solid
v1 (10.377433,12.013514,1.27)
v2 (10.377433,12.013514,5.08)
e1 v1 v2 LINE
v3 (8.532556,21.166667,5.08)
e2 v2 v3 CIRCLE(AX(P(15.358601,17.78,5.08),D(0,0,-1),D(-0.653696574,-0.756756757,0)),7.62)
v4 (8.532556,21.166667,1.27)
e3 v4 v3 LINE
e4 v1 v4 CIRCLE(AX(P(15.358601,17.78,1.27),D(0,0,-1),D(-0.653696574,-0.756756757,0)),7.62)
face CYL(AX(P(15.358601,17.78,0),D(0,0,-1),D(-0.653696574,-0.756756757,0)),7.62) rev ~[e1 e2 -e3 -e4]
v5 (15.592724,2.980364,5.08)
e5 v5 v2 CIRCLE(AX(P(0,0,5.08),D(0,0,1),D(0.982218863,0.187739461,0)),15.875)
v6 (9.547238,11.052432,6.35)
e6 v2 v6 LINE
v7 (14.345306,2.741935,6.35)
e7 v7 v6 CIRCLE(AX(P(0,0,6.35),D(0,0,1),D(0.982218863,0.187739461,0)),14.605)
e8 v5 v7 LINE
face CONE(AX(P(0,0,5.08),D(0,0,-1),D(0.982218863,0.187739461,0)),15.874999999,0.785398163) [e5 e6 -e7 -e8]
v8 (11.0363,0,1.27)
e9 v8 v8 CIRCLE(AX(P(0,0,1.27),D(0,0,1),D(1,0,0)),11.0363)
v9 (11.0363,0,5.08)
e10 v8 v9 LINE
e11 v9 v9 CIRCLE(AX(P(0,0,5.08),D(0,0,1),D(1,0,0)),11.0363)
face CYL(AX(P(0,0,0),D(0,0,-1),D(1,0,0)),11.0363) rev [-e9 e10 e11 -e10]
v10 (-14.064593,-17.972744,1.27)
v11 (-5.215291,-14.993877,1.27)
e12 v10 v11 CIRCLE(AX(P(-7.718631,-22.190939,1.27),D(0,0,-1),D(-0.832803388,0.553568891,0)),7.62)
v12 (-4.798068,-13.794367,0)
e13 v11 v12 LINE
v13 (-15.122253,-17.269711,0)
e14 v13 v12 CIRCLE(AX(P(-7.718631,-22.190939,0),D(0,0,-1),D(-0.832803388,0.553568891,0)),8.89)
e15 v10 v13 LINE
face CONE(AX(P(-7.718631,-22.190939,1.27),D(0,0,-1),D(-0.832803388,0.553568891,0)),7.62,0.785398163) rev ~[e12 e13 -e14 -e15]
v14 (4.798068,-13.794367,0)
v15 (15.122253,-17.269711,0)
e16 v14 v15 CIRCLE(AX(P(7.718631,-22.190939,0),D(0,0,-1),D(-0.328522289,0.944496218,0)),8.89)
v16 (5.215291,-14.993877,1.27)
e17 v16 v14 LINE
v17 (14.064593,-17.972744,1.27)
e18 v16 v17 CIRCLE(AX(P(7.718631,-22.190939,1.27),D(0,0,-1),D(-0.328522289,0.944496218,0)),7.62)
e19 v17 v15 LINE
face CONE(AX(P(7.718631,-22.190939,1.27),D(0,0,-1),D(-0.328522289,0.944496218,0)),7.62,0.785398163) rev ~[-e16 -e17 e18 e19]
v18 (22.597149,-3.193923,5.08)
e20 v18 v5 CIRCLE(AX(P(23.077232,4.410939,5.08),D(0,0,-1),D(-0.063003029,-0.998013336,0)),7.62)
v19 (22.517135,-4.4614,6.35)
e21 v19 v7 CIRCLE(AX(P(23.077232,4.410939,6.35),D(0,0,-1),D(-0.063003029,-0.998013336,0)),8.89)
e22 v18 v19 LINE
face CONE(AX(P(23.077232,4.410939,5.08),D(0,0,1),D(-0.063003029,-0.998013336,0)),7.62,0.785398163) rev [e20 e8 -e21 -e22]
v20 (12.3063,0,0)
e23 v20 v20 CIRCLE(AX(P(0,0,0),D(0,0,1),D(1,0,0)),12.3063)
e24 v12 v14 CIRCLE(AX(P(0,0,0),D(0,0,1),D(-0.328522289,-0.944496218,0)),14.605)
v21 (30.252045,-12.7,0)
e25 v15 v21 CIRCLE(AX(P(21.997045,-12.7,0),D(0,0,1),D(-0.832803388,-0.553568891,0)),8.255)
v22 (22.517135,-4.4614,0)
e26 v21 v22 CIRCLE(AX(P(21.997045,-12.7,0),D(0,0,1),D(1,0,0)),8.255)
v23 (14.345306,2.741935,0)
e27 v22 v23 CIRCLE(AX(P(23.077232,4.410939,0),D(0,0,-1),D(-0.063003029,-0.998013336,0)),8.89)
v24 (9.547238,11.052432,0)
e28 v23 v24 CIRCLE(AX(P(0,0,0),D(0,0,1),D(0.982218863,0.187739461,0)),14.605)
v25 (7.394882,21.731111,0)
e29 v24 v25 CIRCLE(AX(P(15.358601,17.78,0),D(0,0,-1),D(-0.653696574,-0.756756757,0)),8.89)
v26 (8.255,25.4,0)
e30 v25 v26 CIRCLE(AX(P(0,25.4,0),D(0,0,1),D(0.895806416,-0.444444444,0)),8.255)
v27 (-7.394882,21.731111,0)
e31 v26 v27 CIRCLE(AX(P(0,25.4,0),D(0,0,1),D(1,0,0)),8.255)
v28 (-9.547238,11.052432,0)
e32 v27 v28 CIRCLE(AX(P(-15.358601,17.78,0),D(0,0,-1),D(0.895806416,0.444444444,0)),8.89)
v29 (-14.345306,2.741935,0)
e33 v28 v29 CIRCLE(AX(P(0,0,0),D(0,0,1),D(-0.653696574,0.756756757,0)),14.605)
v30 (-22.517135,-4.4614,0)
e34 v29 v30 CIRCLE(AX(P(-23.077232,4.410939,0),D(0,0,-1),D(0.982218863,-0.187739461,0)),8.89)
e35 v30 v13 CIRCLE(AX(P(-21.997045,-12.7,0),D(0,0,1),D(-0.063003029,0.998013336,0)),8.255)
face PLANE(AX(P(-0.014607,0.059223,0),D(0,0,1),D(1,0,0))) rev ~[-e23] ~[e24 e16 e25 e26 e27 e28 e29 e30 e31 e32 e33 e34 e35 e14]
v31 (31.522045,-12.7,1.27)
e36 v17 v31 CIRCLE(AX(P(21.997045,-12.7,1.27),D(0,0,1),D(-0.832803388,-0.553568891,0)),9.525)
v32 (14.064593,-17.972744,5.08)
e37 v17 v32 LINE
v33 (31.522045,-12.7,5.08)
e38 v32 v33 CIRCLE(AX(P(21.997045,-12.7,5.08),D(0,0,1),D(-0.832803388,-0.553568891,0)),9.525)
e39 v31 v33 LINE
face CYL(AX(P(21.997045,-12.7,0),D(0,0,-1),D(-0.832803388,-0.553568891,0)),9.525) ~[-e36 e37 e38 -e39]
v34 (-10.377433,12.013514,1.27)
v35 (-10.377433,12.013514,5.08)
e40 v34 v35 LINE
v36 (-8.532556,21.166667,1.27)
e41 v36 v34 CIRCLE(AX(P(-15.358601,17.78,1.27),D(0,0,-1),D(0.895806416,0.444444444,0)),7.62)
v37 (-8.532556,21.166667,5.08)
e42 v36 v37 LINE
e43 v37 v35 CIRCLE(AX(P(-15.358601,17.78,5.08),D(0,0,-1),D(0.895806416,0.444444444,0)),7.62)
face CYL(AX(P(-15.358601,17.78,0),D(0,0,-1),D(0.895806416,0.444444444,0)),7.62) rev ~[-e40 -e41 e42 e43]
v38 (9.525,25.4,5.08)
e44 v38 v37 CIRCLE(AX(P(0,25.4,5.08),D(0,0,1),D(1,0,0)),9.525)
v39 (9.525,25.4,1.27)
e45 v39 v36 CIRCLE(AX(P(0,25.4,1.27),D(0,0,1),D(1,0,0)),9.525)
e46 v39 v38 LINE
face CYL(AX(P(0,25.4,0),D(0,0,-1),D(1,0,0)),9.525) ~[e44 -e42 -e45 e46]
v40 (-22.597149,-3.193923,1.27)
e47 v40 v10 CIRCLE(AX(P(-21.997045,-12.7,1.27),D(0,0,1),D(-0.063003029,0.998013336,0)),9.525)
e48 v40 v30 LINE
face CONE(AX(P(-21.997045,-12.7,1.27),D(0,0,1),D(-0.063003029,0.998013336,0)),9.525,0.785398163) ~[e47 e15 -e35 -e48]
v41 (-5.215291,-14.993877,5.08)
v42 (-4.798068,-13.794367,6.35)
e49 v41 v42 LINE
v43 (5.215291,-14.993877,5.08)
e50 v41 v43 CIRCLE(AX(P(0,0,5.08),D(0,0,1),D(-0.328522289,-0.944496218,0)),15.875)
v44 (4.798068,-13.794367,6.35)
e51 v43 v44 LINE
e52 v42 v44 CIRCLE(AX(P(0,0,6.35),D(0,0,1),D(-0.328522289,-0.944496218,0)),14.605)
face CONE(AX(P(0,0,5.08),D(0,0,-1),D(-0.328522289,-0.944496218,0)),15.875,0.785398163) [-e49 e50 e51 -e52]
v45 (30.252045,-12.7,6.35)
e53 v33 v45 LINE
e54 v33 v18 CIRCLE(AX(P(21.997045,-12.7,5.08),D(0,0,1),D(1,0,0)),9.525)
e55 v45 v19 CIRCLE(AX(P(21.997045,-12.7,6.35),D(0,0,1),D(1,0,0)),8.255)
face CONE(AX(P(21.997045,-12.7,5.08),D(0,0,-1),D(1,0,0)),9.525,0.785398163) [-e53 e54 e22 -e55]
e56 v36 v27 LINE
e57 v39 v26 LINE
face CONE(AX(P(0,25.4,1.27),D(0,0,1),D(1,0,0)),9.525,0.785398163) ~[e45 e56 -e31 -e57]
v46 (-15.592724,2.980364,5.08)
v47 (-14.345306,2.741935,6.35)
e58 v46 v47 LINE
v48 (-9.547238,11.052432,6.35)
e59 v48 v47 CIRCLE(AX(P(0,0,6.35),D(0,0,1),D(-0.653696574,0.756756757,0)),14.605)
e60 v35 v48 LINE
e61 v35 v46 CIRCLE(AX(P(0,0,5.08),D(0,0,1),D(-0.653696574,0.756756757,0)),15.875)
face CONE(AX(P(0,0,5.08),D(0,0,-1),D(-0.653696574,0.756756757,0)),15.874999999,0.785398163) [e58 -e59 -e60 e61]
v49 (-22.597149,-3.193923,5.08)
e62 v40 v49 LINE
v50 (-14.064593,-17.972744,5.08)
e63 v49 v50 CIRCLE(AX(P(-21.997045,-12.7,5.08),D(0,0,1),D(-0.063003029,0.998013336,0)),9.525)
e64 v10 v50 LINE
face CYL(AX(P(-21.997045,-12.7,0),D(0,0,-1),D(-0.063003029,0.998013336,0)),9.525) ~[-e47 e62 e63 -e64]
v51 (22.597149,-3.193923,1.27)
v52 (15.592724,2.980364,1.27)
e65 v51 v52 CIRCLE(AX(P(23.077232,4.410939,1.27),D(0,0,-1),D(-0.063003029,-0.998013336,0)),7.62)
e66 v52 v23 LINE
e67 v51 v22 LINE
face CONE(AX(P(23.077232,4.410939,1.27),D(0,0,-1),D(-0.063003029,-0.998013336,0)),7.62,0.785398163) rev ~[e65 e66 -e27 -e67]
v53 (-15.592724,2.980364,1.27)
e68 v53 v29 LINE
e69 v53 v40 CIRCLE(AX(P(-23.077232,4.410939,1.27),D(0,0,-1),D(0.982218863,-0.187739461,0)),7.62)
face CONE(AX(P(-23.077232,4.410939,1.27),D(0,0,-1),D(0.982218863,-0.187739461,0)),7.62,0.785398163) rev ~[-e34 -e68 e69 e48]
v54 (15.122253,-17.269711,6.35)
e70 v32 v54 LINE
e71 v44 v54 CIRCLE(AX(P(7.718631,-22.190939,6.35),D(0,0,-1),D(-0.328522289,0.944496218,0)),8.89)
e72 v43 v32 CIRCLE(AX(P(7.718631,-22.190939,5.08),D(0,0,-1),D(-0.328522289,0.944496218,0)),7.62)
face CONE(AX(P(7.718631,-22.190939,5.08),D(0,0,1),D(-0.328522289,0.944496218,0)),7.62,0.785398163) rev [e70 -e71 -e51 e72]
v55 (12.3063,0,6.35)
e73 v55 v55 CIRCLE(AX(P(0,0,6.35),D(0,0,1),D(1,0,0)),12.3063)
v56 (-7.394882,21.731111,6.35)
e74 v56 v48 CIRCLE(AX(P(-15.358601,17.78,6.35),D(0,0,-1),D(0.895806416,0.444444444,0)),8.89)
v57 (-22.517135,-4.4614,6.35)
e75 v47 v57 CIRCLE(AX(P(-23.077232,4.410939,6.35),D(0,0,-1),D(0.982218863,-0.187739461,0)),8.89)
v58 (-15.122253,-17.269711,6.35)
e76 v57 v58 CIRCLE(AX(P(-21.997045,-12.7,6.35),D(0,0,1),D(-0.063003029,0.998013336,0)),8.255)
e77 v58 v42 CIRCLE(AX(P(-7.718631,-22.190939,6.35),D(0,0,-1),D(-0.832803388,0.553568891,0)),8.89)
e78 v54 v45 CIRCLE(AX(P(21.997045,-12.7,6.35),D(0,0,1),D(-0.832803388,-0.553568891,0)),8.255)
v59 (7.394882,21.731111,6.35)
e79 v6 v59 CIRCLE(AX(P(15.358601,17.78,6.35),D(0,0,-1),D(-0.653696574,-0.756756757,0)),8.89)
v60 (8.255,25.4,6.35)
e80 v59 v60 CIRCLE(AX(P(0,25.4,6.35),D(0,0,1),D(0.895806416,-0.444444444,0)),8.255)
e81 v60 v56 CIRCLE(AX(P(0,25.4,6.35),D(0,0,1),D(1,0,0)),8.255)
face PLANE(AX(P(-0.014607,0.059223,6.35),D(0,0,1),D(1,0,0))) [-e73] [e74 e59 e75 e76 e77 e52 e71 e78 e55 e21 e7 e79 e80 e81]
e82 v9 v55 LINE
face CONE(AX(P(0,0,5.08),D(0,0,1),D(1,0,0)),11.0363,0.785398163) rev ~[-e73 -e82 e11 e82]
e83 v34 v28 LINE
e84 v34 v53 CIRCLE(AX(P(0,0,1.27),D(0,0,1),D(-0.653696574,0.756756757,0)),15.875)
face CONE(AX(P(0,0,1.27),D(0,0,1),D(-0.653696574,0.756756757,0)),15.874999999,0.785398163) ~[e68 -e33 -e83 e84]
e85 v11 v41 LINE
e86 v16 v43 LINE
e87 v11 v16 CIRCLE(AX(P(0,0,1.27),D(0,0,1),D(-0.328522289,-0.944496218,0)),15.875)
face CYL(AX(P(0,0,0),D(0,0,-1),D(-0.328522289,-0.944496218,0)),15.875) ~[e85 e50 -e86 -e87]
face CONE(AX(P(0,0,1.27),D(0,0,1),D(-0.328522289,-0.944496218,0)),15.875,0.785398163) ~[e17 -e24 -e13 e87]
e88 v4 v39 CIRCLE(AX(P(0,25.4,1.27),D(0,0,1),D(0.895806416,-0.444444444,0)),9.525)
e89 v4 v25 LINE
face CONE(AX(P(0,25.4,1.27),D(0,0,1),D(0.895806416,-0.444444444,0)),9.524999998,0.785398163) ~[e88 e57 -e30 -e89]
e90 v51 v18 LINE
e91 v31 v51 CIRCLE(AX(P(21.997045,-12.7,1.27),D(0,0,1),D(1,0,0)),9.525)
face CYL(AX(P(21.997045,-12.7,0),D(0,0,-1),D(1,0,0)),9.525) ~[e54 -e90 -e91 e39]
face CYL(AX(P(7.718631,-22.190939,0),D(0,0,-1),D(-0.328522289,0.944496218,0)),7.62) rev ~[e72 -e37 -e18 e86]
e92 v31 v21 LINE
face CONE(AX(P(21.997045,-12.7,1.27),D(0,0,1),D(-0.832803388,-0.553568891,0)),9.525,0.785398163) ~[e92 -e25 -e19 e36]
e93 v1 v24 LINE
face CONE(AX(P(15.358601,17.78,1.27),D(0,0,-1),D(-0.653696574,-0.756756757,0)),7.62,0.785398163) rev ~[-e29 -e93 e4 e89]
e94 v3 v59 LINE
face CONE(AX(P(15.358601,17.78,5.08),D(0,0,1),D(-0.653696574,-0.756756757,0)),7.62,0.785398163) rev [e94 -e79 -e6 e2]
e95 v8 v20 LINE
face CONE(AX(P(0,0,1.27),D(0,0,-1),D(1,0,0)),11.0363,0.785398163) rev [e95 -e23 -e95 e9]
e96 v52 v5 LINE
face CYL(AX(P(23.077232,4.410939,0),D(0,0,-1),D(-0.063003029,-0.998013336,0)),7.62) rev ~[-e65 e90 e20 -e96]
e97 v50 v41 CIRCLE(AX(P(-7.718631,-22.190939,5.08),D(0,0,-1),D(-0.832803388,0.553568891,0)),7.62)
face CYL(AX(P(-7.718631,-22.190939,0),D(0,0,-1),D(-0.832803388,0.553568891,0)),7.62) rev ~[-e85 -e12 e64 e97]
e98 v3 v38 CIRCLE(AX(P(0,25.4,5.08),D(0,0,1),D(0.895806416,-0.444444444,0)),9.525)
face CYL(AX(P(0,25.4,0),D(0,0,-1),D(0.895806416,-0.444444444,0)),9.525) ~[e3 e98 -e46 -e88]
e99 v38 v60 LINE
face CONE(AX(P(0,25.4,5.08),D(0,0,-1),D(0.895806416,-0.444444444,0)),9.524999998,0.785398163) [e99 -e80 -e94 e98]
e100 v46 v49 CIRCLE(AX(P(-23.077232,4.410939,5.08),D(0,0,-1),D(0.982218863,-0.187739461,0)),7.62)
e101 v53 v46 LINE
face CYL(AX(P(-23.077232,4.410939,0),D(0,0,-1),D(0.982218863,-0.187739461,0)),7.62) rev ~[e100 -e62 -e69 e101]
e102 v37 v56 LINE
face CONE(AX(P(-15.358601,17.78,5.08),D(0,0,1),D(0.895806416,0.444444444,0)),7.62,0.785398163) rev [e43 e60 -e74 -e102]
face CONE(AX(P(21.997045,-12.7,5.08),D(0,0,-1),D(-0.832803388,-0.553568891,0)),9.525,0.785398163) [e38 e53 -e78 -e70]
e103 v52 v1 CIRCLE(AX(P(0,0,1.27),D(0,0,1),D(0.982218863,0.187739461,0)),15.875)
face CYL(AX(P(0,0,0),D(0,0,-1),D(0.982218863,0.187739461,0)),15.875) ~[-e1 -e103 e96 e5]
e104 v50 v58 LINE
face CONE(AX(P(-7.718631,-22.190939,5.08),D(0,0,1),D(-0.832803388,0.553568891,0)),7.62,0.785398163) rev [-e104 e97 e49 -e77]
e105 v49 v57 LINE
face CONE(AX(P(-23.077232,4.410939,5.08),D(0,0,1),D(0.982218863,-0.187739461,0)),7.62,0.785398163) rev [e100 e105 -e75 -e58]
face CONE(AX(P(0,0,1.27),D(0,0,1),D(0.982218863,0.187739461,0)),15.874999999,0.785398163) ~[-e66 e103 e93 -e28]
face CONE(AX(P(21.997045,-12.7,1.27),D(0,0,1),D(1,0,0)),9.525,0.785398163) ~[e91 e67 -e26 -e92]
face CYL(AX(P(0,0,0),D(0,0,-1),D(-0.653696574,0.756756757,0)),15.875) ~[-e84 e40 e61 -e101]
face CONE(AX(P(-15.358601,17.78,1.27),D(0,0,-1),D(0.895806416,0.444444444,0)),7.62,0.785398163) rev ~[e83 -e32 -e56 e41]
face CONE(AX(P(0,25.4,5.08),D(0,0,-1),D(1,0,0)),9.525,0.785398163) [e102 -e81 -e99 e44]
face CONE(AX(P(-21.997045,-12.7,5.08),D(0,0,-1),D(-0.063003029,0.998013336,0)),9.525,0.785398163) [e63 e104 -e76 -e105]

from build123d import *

# Parameters (mm, degrees)
F0_R     = 11.0363
F1_DEPTH = 6.35
F2_SIZE  = 1.27


# Not quite as in the source:
# - a feature names something its author has since deleted; it is built from what else it names


with BuildPart() as f1:
    # F0 (on Top) → F1 (new body)
    with BuildSketch(Plane.XY):
        with BuildLine():
            ThreePointArc((13.7481534459, -7.9374997215), (15.334072534, -4.1087521857), (15.875, 0))
            ThreePointArc((15.875, 0), (15.8042735617, 1.4968507561), (15.592724449, 2.9803639471))
            ThreePointArc((15.592724449, 2.9803639471), (13.7481532851, 7.9375), (10.3774331152, 12.0135135135))
            ThreePointArc((10.3774331152, 12.0135135135), (5.5362937901, 14.8783425176), (-1.09e-08, 15.875))
            ThreePointArc((-1.09e-08, 15.875), (-5.5362938003, 14.8783425138), (-10.3774331152, 12.0135135135))
            ThreePointArc((-10.3774331152, 12.0135135135), (-13.7481532851, 7.9375), (-15.592724449, 2.9803639471))
            ThreePointArc((-15.592724449, 2.9803639471), (-15.6531695071, -2.6446000421), (-13.7481534335, -7.9374997429))
            ThreePointArc((-13.7481534335, -7.9374997429), (-10.1168758016, -12.2337422327), (-5.2152913338, -14.9938774606))
            ThreePointArc((-5.2152913338, -14.9938774606), (0, -15.875), (5.2152913338, -14.9938774606))
            ThreePointArc((5.2152913338, -14.9938774606), (10.1168758111, -12.2337422248), (13.7481534459, -7.9374997215))
        make_face()
        Circle(F0_R, mode=Mode.SUBTRACT)
        with BuildLine():
            ThreePointArc((15.592724449, 2.9803639471), (15.8042735617, 1.4968507561), (15.875, 0))
            ThreePointArc((15.875, 0), (15.334072534, -4.1087521857), (13.7481534459, -7.9374997215))
            ThreePointArc((13.7481534459, -7.9374997215), (17.4968931029, -4.3051053849), (22.5971491052, -3.1939229768))
            ThreePointArc((22.5971491052, -3.1939229768), (18.038469294, -1.3052898819), (15.592724449, 2.9803639471))
        make_face()
        with BuildLine():
            ThreePointArc((14.0645929883, -17.9727436898), (12.4767771707, -13.0002009006), (13.7481534459, -7.9374997215))
            ThreePointArc((13.7481534459, -7.9374997215), (10.1168758111, -12.2337422248), (5.2152913338, -14.9938774606))
            ThreePointArc((5.2152913338, -14.9938774606), (10.149648844, -14.9691277131), (14.0645929883, -17.9727436898))
        make_face()
        with BuildLine():
            ThreePointArc((22.5971491052, -3.1939229768), (17.4968931029, -4.3051053849), (13.7481534459, -7.9374997215))
            ThreePointArc((13.7481534459, -7.9374997215), (12.4767771707, -13.0002009006), (14.0645929883, -17.9727436898))
            ThreePointArc((14.0645929883, -17.9727436898), (24.751043908, -21.81817506), (31.5220452561, -12.7))
            ThreePointArc((31.5220452561, -12.7), (28.9411655806, -6.1804280878), (22.5971491052, -3.1939229768))
        make_face()
        with BuildLine():
            ThreePointArc((-1.09e-08, 15.875), (5.5362937901, 14.8783425176), (10.3774331152, 12.0135135135))
            ThreePointArc((10.3774331152, 12.0135135135), (7.88882045, 16.274417595), (8.5325561169, 21.1666666667))
            ThreePointArc((8.5325561169, 21.1666666667), (5.0201157809, 17.3053065193), (-1.09e-08, 15.875))
        make_face()
        with BuildLine():
            ThreePointArc((-10.3774331152, 12.0135135135), (-5.5362938003, 14.8783425138), (-1.09e-08, 15.875))
            ThreePointArc((-1.09e-08, 15.875), (-5.0201157901, 17.305306525), (-8.5325561169, 21.1666666667))
            ThreePointArc((-8.5325561169, 21.1666666667), (-7.88882045, 16.274417595), (-10.3774331152, 12.0135135135))
        make_face()
        with BuildLine():
            ThreePointArc((-8.5325561169, 21.1666666667), (-5.0201157901, 17.305306525), (-1.09e-08, 15.875))
            ThreePointArc((-1.09e-08, 15.875), (5.0201157809, 17.3053065193), (8.5325561169, 21.1666666667))
            ThreePointArc((8.5325561169, 21.1666666667), (9.2735705641, 23.2259452645), (9.525, 25.4))
            ThreePointArc((9.525, 25.4), (-2.1740547355, 34.6735705641), (-8.5325561169, 21.1666666667))
        make_face()
        with BuildLine():
            ThreePointArc((-14.0645929883, -17.9727436898), (-10.149648844, -14.9691277131), (-5.2152913338, -14.9938774606))
            ThreePointArc((-5.2152913338, -14.9938774606), (-10.1168758016, -12.2337422327), (-13.7481534335, -7.9374997429))
            ThreePointArc((-13.7481534335, -7.9374997429), (-12.7966017991, -10.234748452), (-12.4720452561, -12.7))
            ThreePointArc((-12.4720452561, -12.7), (-12.8788701961, -15.4539986519), (-14.0645929883, -17.9727436898))
        make_face()
        with BuildLine():
            ThreePointArc((-22.5971491052, -3.1939229768), (-17.496893092, -4.3051053908), (-13.7481534335, -7.9374997429))
            ThreePointArc((-13.7481534335, -7.9374997429), (-15.6531695071, -2.6446000421), (-15.592724449, 2.9803639471))
            ThreePointArc((-15.592724449, 2.9803639471), (-18.038469294, -1.3052898819), (-22.5971491052, -3.1939229768))
        make_face()
        with BuildLine():
            ThreePointArc((-12.4720452561, -12.7), (-12.7966017991, -10.234748452), (-13.7481534335, -7.9374997429))
            ThreePointArc((-13.7481534335, -7.9374997429), (-17.496893092, -4.3051053908), (-22.5971491052, -3.1939229768))
            ThreePointArc((-22.5971491052, -3.1939229768), (-30.2459372272, -17.4625), (-14.0645929883, -17.9727436898))
            ThreePointArc((-14.0645929883, -17.9727436898), (-12.8788701961, -15.4539986519), (-12.4720452561, -12.7))
        make_face()
    extrude(amount=F1_DEPTH)

    # F2
    f2_edges = [f1.edges().sort_by_distance(p)[0] for p in [
        (13.748153, 7.9375, 0),
        (7.88882, 16.274418, 0),
        (0, 34.925, 0),
        (-7.88882, 16.274418, 0),
        (-13.748153, 7.9375, 0),
        (-18.038469, -1.30529, 0),
        (-30.245937, -17.4625, 0),
        (-10.149649, -14.969128, 0),
        (0, -15.875, 0),
        (10.149649, -14.969128, 0),
        (30.245937, -17.4625, 0),
        (18.038469, -1.30529, 0),
        (-11.0363, 0, 0),
        (13.748153, 7.9375, 6.35),
        (7.88882, 16.274418, 6.35),
        (0, 34.925, 6.35),
        (-7.88882, 16.274418, 6.35),
        (-13.748153, 7.9375, 6.35),
        (-18.038469, -1.30529, 6.35),
        (-30.245937, -17.4625, 6.35),
        (-10.149649, -14.969128, 6.35),
        (0, -15.875, 6.35),
        (10.149649, -14.969128, 6.35),
        (30.245937, -17.4625, 6.35),
        (18.038469, -1.30529, 6.35),
        (-11.0363, 0, 6.35),
    ]]
    chamfer(f2_edges, length=F2_SIZE)


solid = f1.part
